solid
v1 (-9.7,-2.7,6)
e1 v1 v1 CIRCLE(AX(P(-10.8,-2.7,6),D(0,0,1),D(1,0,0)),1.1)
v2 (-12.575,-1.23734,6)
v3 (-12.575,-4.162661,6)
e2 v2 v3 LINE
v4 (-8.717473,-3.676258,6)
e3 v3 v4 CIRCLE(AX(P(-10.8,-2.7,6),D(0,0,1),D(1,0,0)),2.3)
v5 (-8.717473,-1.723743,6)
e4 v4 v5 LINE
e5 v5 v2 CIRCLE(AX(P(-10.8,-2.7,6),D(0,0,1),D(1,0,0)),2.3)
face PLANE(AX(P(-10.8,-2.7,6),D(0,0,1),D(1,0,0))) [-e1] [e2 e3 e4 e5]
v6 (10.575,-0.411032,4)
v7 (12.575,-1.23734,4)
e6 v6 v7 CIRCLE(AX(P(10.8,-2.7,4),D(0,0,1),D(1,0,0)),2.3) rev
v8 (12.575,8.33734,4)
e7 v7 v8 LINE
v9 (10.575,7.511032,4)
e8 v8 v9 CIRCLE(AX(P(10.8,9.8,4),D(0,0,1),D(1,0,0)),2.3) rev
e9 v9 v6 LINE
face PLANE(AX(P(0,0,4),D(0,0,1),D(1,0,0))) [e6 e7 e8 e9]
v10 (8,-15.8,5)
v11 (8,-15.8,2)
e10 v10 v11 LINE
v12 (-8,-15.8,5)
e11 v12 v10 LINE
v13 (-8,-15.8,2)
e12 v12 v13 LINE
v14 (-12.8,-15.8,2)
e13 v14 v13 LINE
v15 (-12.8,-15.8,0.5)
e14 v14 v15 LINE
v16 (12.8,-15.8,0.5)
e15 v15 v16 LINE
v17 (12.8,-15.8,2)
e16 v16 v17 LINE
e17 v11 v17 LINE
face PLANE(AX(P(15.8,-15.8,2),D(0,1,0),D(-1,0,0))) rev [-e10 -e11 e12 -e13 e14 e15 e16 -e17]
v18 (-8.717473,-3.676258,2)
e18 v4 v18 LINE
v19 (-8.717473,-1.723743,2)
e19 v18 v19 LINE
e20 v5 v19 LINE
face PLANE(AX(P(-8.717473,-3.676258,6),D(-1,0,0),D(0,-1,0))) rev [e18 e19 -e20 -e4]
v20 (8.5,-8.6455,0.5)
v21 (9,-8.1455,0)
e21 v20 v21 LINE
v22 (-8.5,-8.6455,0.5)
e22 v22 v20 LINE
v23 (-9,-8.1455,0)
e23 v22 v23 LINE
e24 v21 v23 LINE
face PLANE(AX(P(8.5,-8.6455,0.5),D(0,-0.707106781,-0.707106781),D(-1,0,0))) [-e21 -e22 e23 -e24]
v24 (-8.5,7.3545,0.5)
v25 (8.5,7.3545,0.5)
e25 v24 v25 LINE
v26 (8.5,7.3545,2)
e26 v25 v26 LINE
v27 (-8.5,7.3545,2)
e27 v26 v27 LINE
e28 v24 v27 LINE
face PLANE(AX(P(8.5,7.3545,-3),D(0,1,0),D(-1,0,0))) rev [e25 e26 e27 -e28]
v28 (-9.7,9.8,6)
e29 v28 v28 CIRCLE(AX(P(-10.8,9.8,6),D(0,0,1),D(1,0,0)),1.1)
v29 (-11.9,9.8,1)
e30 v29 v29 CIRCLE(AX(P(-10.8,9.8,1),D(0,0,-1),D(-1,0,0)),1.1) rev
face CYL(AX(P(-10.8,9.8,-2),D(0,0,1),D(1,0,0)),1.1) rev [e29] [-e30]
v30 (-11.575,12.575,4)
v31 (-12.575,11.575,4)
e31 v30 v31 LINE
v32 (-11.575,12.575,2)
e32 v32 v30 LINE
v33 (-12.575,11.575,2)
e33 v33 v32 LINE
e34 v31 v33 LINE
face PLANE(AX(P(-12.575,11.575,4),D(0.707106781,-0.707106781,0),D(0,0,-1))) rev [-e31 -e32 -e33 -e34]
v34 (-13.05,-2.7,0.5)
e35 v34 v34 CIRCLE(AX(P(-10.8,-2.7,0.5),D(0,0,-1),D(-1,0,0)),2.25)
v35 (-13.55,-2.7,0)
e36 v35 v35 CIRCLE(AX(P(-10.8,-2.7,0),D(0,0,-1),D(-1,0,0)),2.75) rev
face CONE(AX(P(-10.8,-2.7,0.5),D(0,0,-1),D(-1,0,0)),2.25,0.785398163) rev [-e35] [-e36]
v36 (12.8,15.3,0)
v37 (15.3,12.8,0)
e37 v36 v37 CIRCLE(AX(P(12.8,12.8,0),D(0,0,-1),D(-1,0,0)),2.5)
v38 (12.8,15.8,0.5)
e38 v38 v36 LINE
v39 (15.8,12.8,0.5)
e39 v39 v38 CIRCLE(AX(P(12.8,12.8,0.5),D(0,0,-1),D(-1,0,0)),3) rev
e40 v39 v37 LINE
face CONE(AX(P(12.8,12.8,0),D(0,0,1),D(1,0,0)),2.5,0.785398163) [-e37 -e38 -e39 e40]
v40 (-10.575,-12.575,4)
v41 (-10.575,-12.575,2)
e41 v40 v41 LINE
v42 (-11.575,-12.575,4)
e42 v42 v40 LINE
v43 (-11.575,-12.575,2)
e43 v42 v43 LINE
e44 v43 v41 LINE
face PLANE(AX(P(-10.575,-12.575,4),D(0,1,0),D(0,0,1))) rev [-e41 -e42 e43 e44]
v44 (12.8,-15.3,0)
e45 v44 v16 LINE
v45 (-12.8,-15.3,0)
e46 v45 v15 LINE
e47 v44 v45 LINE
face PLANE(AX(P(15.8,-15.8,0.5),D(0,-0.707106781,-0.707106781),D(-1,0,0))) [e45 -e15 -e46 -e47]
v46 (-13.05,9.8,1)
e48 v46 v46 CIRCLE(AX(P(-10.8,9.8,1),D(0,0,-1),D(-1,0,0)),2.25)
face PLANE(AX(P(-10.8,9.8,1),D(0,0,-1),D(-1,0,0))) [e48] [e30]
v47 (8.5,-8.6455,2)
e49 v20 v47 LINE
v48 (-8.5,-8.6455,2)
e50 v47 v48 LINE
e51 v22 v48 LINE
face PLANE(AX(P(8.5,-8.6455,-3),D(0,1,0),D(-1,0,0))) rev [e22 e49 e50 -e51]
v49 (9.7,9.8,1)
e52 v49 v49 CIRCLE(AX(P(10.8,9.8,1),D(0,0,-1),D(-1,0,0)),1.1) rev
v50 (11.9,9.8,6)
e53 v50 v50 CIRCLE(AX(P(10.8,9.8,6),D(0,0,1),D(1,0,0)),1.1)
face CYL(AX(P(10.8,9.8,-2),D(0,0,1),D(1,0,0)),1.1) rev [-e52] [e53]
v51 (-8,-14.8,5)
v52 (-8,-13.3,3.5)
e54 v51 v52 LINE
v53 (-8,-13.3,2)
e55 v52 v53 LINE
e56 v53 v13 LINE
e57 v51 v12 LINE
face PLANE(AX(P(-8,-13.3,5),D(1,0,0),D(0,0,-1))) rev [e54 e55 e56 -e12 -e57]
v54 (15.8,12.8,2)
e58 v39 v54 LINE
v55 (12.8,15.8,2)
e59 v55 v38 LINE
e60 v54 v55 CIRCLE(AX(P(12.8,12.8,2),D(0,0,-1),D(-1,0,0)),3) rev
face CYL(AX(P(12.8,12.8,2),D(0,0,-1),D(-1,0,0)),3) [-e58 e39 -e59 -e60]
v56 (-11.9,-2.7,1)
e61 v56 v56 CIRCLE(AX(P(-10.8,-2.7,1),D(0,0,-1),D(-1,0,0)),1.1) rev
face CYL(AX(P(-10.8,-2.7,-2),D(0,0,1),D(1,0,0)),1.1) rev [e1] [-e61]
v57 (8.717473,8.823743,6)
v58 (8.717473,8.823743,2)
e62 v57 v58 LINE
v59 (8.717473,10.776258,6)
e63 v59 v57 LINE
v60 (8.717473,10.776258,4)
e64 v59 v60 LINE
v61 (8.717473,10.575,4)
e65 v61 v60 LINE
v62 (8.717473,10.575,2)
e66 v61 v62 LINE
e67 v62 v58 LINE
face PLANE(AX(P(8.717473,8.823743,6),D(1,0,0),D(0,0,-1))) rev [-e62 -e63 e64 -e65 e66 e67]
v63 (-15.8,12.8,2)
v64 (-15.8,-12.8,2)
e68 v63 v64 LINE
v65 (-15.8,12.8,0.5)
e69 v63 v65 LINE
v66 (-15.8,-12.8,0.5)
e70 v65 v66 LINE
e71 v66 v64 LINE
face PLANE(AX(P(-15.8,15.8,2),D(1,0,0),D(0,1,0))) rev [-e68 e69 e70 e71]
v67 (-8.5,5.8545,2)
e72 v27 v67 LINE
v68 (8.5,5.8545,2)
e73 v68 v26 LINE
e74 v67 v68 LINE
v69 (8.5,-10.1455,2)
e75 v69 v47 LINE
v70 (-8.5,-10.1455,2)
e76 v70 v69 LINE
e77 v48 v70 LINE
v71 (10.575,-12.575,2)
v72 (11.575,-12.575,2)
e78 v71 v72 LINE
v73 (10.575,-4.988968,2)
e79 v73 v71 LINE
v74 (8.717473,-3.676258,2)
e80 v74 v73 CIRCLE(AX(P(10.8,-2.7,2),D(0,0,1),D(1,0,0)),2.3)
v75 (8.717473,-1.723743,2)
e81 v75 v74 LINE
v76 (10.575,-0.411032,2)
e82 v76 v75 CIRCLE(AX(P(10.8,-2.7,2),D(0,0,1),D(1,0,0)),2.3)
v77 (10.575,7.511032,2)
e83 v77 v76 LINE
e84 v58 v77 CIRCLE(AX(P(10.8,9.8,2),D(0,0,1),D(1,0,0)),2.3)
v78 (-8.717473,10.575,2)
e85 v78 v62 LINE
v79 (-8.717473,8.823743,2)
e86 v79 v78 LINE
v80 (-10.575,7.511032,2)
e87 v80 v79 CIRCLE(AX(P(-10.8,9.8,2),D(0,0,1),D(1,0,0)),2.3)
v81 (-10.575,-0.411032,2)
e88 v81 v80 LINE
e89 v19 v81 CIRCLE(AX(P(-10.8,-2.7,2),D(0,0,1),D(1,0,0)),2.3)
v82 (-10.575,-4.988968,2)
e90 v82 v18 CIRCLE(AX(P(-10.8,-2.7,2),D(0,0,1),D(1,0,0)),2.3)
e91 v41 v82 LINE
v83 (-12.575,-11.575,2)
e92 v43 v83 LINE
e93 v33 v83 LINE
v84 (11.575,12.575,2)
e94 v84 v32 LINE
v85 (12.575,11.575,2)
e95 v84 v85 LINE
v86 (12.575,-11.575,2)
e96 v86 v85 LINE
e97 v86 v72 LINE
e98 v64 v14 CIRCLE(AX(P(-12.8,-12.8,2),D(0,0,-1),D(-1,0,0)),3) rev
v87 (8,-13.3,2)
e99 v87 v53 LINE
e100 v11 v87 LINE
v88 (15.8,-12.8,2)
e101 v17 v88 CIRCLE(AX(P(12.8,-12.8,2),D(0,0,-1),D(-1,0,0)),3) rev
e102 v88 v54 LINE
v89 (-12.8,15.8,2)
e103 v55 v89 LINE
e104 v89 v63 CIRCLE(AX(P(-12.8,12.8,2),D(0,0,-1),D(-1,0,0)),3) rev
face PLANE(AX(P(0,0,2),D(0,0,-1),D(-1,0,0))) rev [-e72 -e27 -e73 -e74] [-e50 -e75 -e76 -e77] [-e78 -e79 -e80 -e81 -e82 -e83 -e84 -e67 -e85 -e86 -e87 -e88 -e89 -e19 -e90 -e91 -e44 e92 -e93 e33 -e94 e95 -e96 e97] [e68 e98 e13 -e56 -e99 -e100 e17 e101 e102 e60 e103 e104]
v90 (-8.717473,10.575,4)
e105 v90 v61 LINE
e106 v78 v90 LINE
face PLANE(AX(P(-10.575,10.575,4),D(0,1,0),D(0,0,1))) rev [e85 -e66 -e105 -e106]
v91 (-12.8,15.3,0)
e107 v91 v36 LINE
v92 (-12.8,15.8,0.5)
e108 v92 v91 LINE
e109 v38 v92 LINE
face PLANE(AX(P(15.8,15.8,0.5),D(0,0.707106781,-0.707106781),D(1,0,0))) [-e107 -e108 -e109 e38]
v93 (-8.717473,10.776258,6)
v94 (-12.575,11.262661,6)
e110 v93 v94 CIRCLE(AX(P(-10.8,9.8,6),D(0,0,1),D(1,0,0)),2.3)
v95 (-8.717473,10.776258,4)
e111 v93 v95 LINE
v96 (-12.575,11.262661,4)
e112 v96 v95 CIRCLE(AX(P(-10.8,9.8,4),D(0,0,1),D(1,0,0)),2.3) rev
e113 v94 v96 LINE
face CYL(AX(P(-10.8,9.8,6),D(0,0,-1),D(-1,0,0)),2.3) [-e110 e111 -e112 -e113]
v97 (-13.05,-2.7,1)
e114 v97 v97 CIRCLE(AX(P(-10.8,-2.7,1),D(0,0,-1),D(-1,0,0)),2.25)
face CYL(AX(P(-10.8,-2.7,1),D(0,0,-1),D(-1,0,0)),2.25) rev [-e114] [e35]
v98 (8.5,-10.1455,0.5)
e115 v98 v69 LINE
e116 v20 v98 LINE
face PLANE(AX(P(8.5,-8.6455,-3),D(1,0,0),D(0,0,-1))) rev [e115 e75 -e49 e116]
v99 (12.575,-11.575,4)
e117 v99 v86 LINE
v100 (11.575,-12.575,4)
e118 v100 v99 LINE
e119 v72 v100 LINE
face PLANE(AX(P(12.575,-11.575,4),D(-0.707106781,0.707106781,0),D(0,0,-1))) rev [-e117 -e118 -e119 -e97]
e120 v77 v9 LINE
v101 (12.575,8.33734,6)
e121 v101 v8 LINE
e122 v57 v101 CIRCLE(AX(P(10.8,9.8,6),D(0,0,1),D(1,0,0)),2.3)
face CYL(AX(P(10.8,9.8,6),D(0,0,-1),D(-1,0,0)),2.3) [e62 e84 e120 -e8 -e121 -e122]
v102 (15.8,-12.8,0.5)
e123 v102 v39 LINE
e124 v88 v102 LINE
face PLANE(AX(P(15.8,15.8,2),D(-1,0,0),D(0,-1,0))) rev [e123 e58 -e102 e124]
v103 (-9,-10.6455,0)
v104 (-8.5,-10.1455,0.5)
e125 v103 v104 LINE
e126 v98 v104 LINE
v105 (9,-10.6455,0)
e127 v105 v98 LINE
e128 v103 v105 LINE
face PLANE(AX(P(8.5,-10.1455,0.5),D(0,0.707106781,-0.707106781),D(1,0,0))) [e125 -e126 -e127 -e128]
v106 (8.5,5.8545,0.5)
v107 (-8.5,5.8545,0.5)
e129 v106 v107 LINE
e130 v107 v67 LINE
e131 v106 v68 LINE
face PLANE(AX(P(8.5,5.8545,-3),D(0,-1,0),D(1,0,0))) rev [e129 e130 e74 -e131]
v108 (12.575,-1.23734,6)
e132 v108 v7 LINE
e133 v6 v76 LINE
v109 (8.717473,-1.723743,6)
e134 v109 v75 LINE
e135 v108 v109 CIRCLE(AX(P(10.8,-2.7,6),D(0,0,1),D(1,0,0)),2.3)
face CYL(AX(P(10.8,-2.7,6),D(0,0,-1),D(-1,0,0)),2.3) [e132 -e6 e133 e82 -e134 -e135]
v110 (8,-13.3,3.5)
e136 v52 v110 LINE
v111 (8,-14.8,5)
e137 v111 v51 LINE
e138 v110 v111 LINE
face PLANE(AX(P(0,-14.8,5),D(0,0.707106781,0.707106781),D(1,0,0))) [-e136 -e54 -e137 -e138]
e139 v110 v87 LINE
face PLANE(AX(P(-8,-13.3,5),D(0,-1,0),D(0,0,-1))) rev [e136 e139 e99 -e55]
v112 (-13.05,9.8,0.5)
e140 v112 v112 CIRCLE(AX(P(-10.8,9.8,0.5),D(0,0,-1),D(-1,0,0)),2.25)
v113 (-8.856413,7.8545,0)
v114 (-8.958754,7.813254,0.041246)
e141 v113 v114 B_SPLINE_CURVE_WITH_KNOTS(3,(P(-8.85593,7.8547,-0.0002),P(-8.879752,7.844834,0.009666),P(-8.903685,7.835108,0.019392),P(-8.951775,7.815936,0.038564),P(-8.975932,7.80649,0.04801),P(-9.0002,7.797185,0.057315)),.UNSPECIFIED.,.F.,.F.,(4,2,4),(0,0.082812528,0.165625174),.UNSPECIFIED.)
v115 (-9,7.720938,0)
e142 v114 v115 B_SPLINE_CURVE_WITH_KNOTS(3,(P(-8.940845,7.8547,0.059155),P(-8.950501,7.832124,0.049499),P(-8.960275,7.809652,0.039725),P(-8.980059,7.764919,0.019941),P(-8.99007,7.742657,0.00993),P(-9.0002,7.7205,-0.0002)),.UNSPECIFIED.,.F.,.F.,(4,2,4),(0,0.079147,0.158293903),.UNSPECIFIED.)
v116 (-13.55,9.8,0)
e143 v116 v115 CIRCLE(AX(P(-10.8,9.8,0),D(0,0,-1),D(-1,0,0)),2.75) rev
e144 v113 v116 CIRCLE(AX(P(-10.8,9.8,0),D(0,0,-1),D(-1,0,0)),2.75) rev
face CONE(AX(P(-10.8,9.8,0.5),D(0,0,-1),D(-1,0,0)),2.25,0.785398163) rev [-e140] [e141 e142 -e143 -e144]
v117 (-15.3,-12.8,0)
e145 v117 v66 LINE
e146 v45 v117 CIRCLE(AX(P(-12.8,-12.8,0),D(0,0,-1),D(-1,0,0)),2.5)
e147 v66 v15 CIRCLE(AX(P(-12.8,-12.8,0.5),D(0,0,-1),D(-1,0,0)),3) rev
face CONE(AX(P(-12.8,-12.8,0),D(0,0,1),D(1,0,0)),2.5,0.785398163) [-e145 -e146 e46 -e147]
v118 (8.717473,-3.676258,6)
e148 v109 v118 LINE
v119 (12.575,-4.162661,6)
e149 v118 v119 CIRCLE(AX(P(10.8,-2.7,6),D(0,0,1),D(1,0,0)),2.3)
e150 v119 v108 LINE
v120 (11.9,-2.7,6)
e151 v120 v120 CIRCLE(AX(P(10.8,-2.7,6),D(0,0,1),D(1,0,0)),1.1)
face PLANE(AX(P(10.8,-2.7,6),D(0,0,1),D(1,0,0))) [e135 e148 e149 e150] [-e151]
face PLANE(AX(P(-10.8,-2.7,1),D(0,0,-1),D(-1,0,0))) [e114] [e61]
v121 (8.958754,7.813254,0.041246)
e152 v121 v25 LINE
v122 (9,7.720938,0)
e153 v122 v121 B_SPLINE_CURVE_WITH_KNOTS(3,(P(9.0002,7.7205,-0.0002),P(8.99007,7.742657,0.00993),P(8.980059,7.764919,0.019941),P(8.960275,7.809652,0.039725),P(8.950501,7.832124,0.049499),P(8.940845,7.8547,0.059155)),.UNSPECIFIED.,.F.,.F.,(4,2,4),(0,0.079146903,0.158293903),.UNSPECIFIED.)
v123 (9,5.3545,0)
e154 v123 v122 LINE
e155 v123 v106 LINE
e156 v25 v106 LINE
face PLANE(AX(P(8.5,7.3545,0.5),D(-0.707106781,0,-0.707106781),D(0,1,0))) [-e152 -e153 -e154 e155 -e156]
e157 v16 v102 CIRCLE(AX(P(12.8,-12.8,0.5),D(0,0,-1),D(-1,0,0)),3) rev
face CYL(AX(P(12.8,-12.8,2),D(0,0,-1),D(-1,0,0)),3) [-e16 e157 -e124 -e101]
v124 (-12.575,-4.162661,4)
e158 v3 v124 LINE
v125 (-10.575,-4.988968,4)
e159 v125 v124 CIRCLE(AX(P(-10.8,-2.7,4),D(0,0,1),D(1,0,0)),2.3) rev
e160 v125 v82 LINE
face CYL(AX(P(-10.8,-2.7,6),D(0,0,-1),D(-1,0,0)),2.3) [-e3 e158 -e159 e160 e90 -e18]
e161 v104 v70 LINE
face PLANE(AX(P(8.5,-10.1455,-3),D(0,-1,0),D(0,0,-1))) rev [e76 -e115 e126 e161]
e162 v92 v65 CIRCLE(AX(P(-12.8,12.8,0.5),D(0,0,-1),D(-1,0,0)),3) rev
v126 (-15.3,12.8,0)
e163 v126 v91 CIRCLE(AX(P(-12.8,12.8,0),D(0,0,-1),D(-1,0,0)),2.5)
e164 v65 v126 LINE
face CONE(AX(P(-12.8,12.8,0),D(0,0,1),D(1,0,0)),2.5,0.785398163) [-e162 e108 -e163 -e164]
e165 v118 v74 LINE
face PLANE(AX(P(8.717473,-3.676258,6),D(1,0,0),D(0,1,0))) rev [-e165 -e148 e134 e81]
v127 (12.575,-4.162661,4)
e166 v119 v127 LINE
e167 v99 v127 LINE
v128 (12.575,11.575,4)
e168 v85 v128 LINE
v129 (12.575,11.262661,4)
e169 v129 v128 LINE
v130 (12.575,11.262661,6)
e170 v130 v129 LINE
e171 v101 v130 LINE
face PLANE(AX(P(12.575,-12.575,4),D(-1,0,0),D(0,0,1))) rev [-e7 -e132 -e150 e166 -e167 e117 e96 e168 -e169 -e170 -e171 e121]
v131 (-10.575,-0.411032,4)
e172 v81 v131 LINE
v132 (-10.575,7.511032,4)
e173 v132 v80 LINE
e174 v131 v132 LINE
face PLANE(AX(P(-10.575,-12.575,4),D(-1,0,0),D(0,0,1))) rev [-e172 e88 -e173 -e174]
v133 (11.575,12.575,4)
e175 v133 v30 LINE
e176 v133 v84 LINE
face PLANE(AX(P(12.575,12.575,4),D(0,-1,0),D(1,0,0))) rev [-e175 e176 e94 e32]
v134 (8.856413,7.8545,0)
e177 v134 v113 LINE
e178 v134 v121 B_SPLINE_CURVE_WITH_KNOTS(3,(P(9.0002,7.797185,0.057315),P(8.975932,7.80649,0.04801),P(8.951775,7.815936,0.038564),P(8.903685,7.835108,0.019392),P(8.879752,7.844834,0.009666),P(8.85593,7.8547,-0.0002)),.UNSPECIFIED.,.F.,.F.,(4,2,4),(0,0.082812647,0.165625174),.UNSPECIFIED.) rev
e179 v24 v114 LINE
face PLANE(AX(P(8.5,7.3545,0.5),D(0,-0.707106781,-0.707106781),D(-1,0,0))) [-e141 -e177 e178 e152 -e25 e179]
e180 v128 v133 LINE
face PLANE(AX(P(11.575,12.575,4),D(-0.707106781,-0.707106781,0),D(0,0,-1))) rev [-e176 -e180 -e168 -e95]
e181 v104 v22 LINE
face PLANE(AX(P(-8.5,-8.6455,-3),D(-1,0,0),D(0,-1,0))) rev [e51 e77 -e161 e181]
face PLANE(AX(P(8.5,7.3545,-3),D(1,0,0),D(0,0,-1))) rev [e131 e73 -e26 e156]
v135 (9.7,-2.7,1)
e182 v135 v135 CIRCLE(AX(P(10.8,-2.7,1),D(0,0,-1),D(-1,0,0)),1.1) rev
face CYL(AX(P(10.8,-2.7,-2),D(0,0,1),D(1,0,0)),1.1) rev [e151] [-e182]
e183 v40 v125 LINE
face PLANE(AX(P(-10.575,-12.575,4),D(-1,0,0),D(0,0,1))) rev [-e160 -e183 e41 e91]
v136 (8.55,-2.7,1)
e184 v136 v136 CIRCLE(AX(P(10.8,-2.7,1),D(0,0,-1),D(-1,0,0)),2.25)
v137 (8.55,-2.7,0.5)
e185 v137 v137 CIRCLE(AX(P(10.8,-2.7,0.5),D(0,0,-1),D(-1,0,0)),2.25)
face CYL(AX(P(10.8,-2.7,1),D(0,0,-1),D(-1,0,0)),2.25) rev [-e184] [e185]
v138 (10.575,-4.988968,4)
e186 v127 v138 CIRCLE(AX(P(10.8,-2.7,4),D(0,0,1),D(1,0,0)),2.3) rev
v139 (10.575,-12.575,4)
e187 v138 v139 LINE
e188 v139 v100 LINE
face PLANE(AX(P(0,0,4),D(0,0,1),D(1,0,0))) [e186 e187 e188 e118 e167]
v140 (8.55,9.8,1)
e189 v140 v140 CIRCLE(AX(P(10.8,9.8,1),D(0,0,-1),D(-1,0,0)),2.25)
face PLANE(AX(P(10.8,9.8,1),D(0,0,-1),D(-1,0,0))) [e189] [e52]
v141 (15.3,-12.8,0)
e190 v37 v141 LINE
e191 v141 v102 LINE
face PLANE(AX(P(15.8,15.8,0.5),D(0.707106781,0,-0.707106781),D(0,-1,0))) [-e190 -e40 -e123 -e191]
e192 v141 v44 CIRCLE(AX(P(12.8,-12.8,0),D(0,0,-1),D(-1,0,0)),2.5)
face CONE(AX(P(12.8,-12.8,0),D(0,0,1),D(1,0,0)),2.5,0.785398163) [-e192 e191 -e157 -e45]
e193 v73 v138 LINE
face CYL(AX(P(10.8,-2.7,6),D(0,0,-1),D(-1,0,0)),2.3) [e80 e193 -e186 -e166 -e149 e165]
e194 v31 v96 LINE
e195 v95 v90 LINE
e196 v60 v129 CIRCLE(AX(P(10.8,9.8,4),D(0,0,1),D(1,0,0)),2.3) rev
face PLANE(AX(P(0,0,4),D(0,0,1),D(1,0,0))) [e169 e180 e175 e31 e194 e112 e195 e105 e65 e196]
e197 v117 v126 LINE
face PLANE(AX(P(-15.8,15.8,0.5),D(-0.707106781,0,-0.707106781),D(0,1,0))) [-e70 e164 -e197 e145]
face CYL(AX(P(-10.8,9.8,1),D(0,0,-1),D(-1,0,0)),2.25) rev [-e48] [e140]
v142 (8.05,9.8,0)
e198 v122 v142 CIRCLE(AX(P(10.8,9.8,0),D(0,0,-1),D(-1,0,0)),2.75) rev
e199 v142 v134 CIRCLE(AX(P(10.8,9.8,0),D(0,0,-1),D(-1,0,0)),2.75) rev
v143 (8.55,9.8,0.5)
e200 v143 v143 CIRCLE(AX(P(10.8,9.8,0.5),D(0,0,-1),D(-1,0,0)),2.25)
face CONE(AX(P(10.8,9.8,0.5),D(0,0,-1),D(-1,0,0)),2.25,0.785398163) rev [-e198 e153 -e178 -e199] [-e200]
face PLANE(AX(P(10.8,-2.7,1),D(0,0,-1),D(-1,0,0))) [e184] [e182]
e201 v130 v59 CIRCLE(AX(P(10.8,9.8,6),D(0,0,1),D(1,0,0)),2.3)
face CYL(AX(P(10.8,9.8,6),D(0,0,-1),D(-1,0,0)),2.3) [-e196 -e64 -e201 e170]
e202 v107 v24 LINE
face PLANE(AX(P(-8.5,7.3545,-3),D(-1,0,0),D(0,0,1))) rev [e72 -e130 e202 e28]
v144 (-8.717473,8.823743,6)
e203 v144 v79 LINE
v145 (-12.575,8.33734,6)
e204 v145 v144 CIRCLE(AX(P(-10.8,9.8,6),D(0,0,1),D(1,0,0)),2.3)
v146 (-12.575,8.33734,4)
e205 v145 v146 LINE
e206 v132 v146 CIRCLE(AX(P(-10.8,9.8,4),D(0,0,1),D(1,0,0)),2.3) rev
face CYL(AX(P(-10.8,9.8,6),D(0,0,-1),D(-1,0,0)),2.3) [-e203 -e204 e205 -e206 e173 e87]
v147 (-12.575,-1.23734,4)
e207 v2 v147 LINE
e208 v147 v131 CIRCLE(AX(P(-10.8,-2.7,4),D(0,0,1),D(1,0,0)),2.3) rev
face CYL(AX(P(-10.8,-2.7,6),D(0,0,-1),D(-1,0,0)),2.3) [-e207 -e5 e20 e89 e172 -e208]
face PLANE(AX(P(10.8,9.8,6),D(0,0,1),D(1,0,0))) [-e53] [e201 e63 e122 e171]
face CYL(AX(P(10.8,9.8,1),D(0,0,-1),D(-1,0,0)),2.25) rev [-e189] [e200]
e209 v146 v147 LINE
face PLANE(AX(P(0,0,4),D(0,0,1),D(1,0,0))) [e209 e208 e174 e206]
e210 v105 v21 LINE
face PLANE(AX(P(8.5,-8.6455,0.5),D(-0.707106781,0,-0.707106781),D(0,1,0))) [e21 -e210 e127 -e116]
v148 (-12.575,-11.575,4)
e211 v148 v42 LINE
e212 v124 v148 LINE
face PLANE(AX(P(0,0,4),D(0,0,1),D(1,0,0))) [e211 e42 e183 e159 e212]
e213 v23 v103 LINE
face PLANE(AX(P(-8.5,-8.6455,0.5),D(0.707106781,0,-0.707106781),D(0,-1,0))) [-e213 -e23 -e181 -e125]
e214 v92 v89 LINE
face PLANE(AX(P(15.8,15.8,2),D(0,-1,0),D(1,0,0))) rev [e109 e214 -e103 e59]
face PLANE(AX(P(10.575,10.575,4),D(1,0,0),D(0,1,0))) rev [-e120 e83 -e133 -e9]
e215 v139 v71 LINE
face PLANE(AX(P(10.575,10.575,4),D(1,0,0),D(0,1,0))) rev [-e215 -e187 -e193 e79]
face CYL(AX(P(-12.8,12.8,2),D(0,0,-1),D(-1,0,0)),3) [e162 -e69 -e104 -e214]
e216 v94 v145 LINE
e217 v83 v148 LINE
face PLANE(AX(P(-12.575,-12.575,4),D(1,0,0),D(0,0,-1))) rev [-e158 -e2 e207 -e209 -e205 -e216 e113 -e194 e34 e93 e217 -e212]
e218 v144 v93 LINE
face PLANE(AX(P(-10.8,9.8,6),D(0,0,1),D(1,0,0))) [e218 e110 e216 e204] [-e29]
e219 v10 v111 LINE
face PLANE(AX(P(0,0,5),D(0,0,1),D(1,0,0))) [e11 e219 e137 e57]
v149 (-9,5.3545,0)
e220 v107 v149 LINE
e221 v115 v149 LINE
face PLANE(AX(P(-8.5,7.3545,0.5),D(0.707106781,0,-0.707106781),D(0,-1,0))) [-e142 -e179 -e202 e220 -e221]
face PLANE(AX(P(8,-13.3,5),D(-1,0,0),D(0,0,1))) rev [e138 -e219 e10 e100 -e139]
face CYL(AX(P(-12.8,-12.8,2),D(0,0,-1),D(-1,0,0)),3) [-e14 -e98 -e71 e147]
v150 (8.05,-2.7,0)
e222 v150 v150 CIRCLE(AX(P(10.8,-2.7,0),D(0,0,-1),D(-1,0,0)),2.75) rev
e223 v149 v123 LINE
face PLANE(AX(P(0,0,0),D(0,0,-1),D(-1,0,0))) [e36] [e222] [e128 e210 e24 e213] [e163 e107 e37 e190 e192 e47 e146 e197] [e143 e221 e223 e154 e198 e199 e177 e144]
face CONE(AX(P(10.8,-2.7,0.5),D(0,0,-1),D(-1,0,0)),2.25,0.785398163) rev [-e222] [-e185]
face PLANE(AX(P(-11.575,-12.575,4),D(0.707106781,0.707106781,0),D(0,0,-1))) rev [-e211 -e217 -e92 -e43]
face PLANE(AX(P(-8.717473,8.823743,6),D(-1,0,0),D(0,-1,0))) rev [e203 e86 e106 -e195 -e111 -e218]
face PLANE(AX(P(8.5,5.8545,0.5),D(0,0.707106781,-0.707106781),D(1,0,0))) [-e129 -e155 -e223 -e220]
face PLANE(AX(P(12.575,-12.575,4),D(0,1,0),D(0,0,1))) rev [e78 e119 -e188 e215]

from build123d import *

# Parameters (mm, degrees)
SKETCH2_W           = 31.6
SKETCH2_H           = 31.6
BOSS_EXTRUDE1_DEPTH = 2
FILLET1_R           = 3
BOSS_EXTRUDE2_DEPTH = 2
CHAMFER1_SIZE       = 1
SKETCH6_W           = 16
SKETCH6_H           = 2.5
BOSS_EXTRUDE3_DEPTH = 3
BOSS_EXTRUDE4_DEPTH = 4
SKETCH8_R           = 1.1
CUT_EXTRUDE1_DEPTH  = 8
SKETCH9_R           = 2.25
CUT_EXTRUDE2_DEPTH  = 1
SKETCH10_W          = 17
SKETCH10_H          = 1.5
CUT_EXTRUDE3_DEPTH  = 5
CHAMFER2_SIZE       = 0.5
CHAMFER3_SIZE       = 1.5


with BuildPart() as part:
    # Sketch2 → Boss-Extrude1 (new body)
    with BuildSketch(Plane.XY):
        Rectangle(SKETCH2_W, SKETCH2_H)
    extrude(amount=BOSS_EXTRUDE1_DEPTH)

    # Fillet1
    fillet1_edges = [part.edges().sort_by_distance(p)[0] for p in [
        (-15.8, 15.8, 1),
        (15.8, 15.8, 1),
        (15.8, -15.8, 1),
        (-15.8, -15.8, 1),
    ]]
    fillet(fillet1_edges, radius=FILLET1_R)

    # Sketch5 → Boss-Extrude2 (add)
    with BuildSketch(Plane.XY.offset(2)):
        Polygon((-10.575, -12.575), (-10.575, 10.575), (10.575, 10.575), (10.575, -12.575), (12.575, -12.575), (12.575, 12.575), (-12.575, 12.575), (-12.575, -12.575), align=None)
    extrude(amount=BOSS_EXTRUDE2_DEPTH)

    # Chamfer1
    chamfer1_edges = [part.edges().sort_by_distance(p)[0] for p in [
        (-12.575, 12.575, 3),
        (-12.575, -12.575, 3),
        (12.575, -12.575, 3),
        (12.575, 12.575, 3),
    ]]
    chamfer(chamfer1_edges, length=CHAMFER1_SIZE)

    # Sketch6 → Boss-Extrude3 (add)
    with BuildSketch(Plane.XY.offset(2)):
        with Locations((0, -14.55)):
            Rectangle(SKETCH6_W, SKETCH6_H)
    extrude(amount=BOSS_EXTRUDE3_DEPTH)

    # Sketch7 → Boss-Extrude4 (add)
    with BuildSketch(Plane.XY.offset(2)):
        with BuildLine():
            Line((12.575, -4.162660527), (12.575, -1.237339569))
            ThreePointArc((12.575, -1.237339569), (10.512267156, -0.418068914), (8.717472576, -1.723742534))
            Line((8.717472576, -1.723742534), (8.717472576, -3.676257561))
            ThreePointArc((8.717472576, -3.676257561), (10.512267156, -4.981931182), (12.575, -4.162660527))
        make_face()
        with BuildLine():
            Line((-12.575, -1.237339569), (-12.575, -4.162660527))
            ThreePointArc((-12.575, -4.162660527), (-10.512267156, -4.981931182), (-8.717472576, -3.676257561))
            Line((-8.717472576, -3.676257561), (-8.717472576, -1.723742534))
            ThreePointArc((-8.717472576, -1.723742534), (-10.512267156, -0.418068914), (-12.575, -1.237339569))
        make_face()
        with BuildLine():
            Line((-12.575, 11.26266067), (-12.575, 8.337339712))
            ThreePointArc((-12.575, 8.337339712), (-10.512267156, 7.518069057), (-8.717472576, 8.823742677))
            Line((-8.717472576, 8.823742677), (-8.717472576, 10.776257704))
            ThreePointArc((-8.717472576, 10.776257704), (-10.512267156, 12.081931325), (-12.575, 11.26266067))
        make_face()
        with BuildLine():
            Line((12.575, 8.337339712), (12.575, 11.26266067))
            ThreePointArc((12.575, 11.26266067), (10.512267156, 12.081931325), (8.717472576, 10.776257704))
            Line((8.717472576, 10.776257704), (8.717472576, 8.823742677))
            ThreePointArc((8.717472576, 8.823742677), (10.512267156, 7.518069057), (12.575, 8.337339712))
        make_face()
    extrude(amount=BOSS_EXTRUDE4_DEPTH)

    # Sketch8 → Cut-Extrude1 (cut)
    with BuildSketch(Plane.XY.offset(6)):
        with Locations((10.800000191, -2.700000048)):
            Circle(SKETCH8_R)
        with Locations((-10.800000191, -2.700000048)):
            Circle(SKETCH8_R)
        with Locations((-10.800000191, 9.800000191)):
            Circle(SKETCH8_R)
        with Locations((10.800000191, 9.800000191)):
            Circle(SKETCH8_R)
    extrude(amount=-CUT_EXTRUDE1_DEPTH, mode=Mode.SUBTRACT)

    # Sketch9 → Cut-Extrude2 (cut)
    with BuildSketch(Plane(origin=(0, 0, 0), x_dir=(-1, 0, 0), z_dir=(0, 0, -1))):
        with Locations((10.800000191, -2.700000048)):
            Circle(SKETCH9_R)
        with Locations((-10.800000191, -2.700000048)):
            Circle(SKETCH9_R)
        with Locations((-10.800000191, 9.800000191)):
            Circle(SKETCH9_R)
        with Locations((10.800000191, 9.800000191)):
            Circle(SKETCH9_R)
    extrude(amount=-CUT_EXTRUDE2_DEPTH, mode=Mode.SUBTRACT)

    # Sketch10 → Cut-Extrude3 (cut)
    with BuildSketch(Plane.XY.offset(2)):
        with Locations((0, -9.395499737)):
            Rectangle(SKETCH10_W, SKETCH10_H)
        with Locations((0, 6.604500263)):
            Rectangle(SKETCH10_W, SKETCH10_H)
    extrude(amount=-CUT_EXTRUDE3_DEPTH, mode=Mode.SUBTRACT)

    # Chamfer2
    # the kernel refuses this chamfer: 0.5 mm, written as the material it takes off along each edge
    with BuildSketch(Plane(origin=(12.8, 15.8, 0), x_dir=(0, 0.02749587661058563, 0.9996219169112968), z_dir=(-1, 0, 0)), Plane(origin=(-15.8, 12.8, 0), x_dir=(-0.02749587661058563, 0, 0.9996219169112968), z_dir=(0, -1, 0)), Plane(origin=(15.8, -12.8, 0), x_dir=(0.02749587661058563, 0, 0.9996219169112968), z_dir=(0, 1, 0)), Plane(origin=(-12.8, -15.8, 0), x_dir=(0, -0.02749587661058563, 0.9996219169112968), z_dir=(1, 0, 0))) as chamfer2_piece_1:
        Polygon((CHAMFER2_SIZE * 0.999621916911, -CHAMFER2_SIZE * 0.0274958766106), (-CHAMFER2_SIZE * 0.0274958766106, -CHAMFER2_SIZE * 0.999621916911), (0, 0), align=None)
    extrude(amount=25.6, mode=Mode.SUBTRACT)
    with BuildSketch(Plane(origin=(-12.8, 12.8, 0), x_dir=(0, 1, 0), z_dir=(1, 0, 0))) as chamfer2_piece_2:
        Polygon((3, CHAMFER2_SIZE), (3 - CHAMFER2_SIZE, 0), (3, 0), align=None)
    revolve(axis=Axis((-12.8, 12.8, 0), (0, 0, 1)), revolution_arc=90, mode=Mode.SUBTRACT)
    with BuildSketch(Plane(origin=(-12.8, -12.8, 0), x_dir=(-1, 0, 0), z_dir=(0, 1, 0))) as chamfer2_piece_3:
        Polygon((3, CHAMFER2_SIZE), (3 - CHAMFER2_SIZE, 0), (3, 0), align=None)
    revolve(axis=Axis((-12.8, -12.8, 0), (0, 0, 1)), revolution_arc=90, mode=Mode.SUBTRACT)
    with BuildSketch(Plane(origin=(12.8, -12.8, 0), x_dir=(0, -1, 0), z_dir=(-1, 0, 0))) as chamfer2_piece_4:
        Polygon((3, CHAMFER2_SIZE), (3 - CHAMFER2_SIZE, 0), (3, 0), align=None)
    revolve(axis=Axis((12.8, -12.8, 0), (0, 0, 1)), revolution_arc=90, mode=Mode.SUBTRACT)
    with BuildSketch(Plane(origin=(12.8, 12.8, 0), x_dir=(0, 1, 0), z_dir=(-1, 0, 0))) as chamfer2_piece_5:
        Polygon((3, -CHAMFER2_SIZE), (3 - CHAMFER2_SIZE, 0), (3, 0), align=None)
    revolve(axis=Axis((12.8, 12.8, 0), (0, 0, -1)), revolution_arc=90, mode=Mode.SUBTRACT)
    with BuildSketch(Plane(origin=(-10.800000191, -2.700000048, 0), x_dir=(-1, 0, 0), z_dir=(0, -1, 0))) as chamfer2_piece_6:
        Polygon((2.25 + CHAMFER2_SIZE, 0), (2.25, -CHAMFER2_SIZE), (2.25, 0), align=None)
    revolve(axis=Axis((-10.800000191, -2.700000048, 0), (0, 0, -1)), mode=Mode.SUBTRACT)
    with BuildSketch(Plane(origin=(10.800000191, -2.700000048, 0), x_dir=(-1, 0, 0), z_dir=(0, -1, 0))) as chamfer2_piece_7:
        Polygon((2.25 + CHAMFER2_SIZE, 0), (2.25, -CHAMFER2_SIZE), (2.25, 0), align=None)
    revolve(axis=Axis((10.800000191, -2.700000048, 0), (0, 0, -1)), mode=Mode.SUBTRACT)
    with BuildSketch(Plane(origin=(10.800000191, 9.800000191, 0), x_dir=(-1, 0, 0), z_dir=(0, -1, 0))) as chamfer2_piece_8:
        Polygon((2.25 + CHAMFER2_SIZE, 0), (2.25, -CHAMFER2_SIZE), (2.25, 0), align=None)
    revolve(axis=Axis((10.800000191, 9.800000191, 0), (0, 0, -1)), mode=Mode.SUBTRACT)
    with BuildSketch(Plane(origin=(-10.800000191, 9.800000191, 0), x_dir=(-1, 0, 0), z_dir=(0, -1, 0))) as chamfer2_piece_9:
        Polygon((2.25 + CHAMFER2_SIZE, 0), (2.25, -CHAMFER2_SIZE), (2.25, 0), align=None)
    revolve(axis=Axis((-10.800000191, 9.800000191, 0), (0, 0, -1)), mode=Mode.SUBTRACT)
    with BuildSketch(Plane(origin=(-8.5, -10.145499737, 0), x_dir=(0, 0.02749587661058563, 0.9996219169112968), z_dir=(1, 0, 0)), Plane(origin=(8.5, -8.645499737, 0), x_dir=(0, -0.02749587661058563, 0.9996219169112968), z_dir=(-1, 0, 0)), Plane(origin=(-8.5, 5.854500263, 0), x_dir=(0, 0.027495876610583895, 0.9996219169112968), z_dir=(1, 0, 0)), Plane(origin=(8.5, 7.354500263, 0), x_dir=(0, -0.027495876610587354, 0.9996219169112968), z_dir=(-1, 0, 0))) as chamfer2_piece_10:
        Polygon((CHAMFER2_SIZE * 0.999621916911, CHAMFER2_SIZE * 0.0274958766106), (-CHAMFER2_SIZE * 0.0274958766106, CHAMFER2_SIZE * 0.999621916911), (0, 0), align=None)
    extrude(amount=17, mode=Mode.SUBTRACT)
    with BuildSketch(Plane(origin=(8.5, -10.145499737, 0), x_dir=(-0.02749587661058563, 0, 0.9996219169112968), z_dir=(0, 1, 0)), Plane(origin=(-8.5, -8.645499737, 0), x_dir=(0.02749587661058563, 0, 0.9996219169112968), z_dir=(0, -1, 0)), Plane(origin=(8.5, 5.854500263, 0), x_dir=(-0.02749587661058563, 0, 0.9996219169112968), z_dir=(0, 1, 0)), Plane(origin=(-8.5, 7.354500263, 0), x_dir=(0.02749587661058563, 0, 0.9996219169112968), z_dir=(0, -1, 0))) as chamfer2_piece_11:
        Polygon((CHAMFER2_SIZE * 0.999621916911, CHAMFER2_SIZE * 0.0274958766106), (-CHAMFER2_SIZE * 0.0274958766106, CHAMFER2_SIZE * 0.999621916911), (0, 0), align=None)
    extrude(amount=1.5, mode=Mode.SUBTRACT)
    with BuildSketch(Plane(origin=(-8.5, -8.645499737, 0), x_dir=(0.02749587661058563, 0, 0.9996219169112968), z_dir=(0, -1, 0))) as chamfer2_piece_12a_section:
        Polygon((CHAMFER2_SIZE * 0.999621916911, CHAMFER2_SIZE * 0.0274958766106), (-CHAMFER2_SIZE * 0.0274958766106, CHAMFER2_SIZE * 0.999621916911), (0, 0), align=None)
    chamfer2_piece_12a = extrude(amount=2.785841494, mode=Mode.PRIVATE)
    chamfer2_piece_12a = split(chamfer2_piece_12a, bisect_by=Plane(origin=(-8.664896813, -10.145499737, 0.164896813), z_dir=(0, -1, 0)), keep=Keep.TOP, mode=Mode.PRIVATE)
    with BuildSketch(Plane(origin=(-9.785841494, -10.145499737, 0), x_dir=(0, 0.02749587661058563, 0.9996219169112968), z_dir=(1, 0, 0))) as chamfer2_piece_12b_section:
        Polygon((CHAMFER2_SIZE * 0.999621916911, CHAMFER2_SIZE * 0.0274958766106), (-CHAMFER2_SIZE * 0.0274958766106, CHAMFER2_SIZE * 0.999621916911), (0, 0), align=None)
    chamfer2_piece_12b = extrude(amount=18.285841494, mode=Mode.PRIVATE)
    chamfer2_piece_12b = split(chamfer2_piece_12b, bisect_by=Plane(origin=(-8.5, -10.310396551, 0.164896813), z_dir=(-1, 0, 0)), keep=Keep.TOP, mode=Mode.PRIVATE)
    chamfer2_piece_12 = chamfer2_piece_12a & chamfer2_piece_12b
    add(chamfer2_piece_12, mode=Mode.SUBTRACT)
    with BuildSketch(Plane(origin=(-8.5, -10.145499737, 0), x_dir=(0, 0.02749587661058563, 0.9996219169112968), z_dir=(1, 0, 0))) as chamfer2_piece_13a_section:
        Polygon((CHAMFER2_SIZE * 0.999621916911, CHAMFER2_SIZE * 0.0274958766106), (-CHAMFER2_SIZE * 0.0274958766106, CHAMFER2_SIZE * 0.999621916911), (0, 0), align=None)
    chamfer2_piece_13a = extrude(amount=18.285841494, mode=Mode.PRIVATE)
    chamfer2_piece_13a = split(chamfer2_piece_13a, bisect_by=Plane(origin=(8.5, -10.310396551, 0.164896813), z_dir=(1, 0, 0)), keep=Keep.TOP, mode=Mode.PRIVATE)
    with BuildSketch(Plane(origin=(8.5, -11.431341231, 0), x_dir=(-0.02749587661058563, 0, 0.9996219169112968), z_dir=(0, 1, 0))) as chamfer2_piece_13b_section:
        Polygon((CHAMFER2_SIZE * 0.999621916911, CHAMFER2_SIZE * 0.0274958766106), (-CHAMFER2_SIZE * 0.0274958766106, CHAMFER2_SIZE * 0.999621916911), (0, 0), align=None)
    chamfer2_piece_13b = extrude(amount=2.785841494, mode=Mode.PRIVATE)
    chamfer2_piece_13b = split(chamfer2_piece_13b, bisect_by=Plane(origin=(8.664896813, -10.145499737, 0.164896813), z_dir=(0, -1, 0)), keep=Keep.TOP, mode=Mode.PRIVATE)
    chamfer2_piece_13 = chamfer2_piece_13a & chamfer2_piece_13b
    add(chamfer2_piece_13, mode=Mode.SUBTRACT)
    with BuildSketch(Plane(origin=(9.785841494, -8.645499737, 0), x_dir=(0, -0.02749587661058563, 0.9996219169112968), z_dir=(-1, 0, 0))) as chamfer2_piece_14a_section:
        Polygon((CHAMFER2_SIZE * 0.999621916911, CHAMFER2_SIZE * 0.0274958766106), (-CHAMFER2_SIZE * 0.0274958766106, CHAMFER2_SIZE * 0.999621916911), (0, 0), align=None)
    chamfer2_piece_14a = extrude(amount=18.285841494, mode=Mode.PRIVATE)
    chamfer2_piece_14a = split(chamfer2_piece_14a, bisect_by=Plane(origin=(8.5, -8.480602924, 0.164896813), z_dir=(1, 0, 0)), keep=Keep.TOP, mode=Mode.PRIVATE)
    with BuildSketch(Plane(origin=(8.5, -10.145499737, 0), x_dir=(-0.02749587661058563, 0, 0.9996219169112968), z_dir=(0, 1, 0))) as chamfer2_piece_14b_section:
        Polygon((CHAMFER2_SIZE * 0.999621916911, CHAMFER2_SIZE * 0.0274958766106), (-CHAMFER2_SIZE * 0.0274958766106, CHAMFER2_SIZE * 0.999621916911), (0, 0), align=None)
    chamfer2_piece_14b = extrude(amount=2.785841494, mode=Mode.PRIVATE)
    chamfer2_piece_14b = split(chamfer2_piece_14b, bisect_by=Plane(origin=(8.664896813, -8.645499737, 0.164896813), z_dir=(0, 1, 0)), keep=Keep.TOP, mode=Mode.PRIVATE)
    chamfer2_piece_14 = chamfer2_piece_14a & chamfer2_piece_14b
    add(chamfer2_piece_14, mode=Mode.SUBTRACT)
    with BuildSketch(Plane(origin=(8.5, -8.645499737, 0), x_dir=(0, -0.02749587661058563, 0.9996219169112968), z_dir=(-1, 0, 0))) as chamfer2_piece_15a_section:
        Polygon((CHAMFER2_SIZE * 0.999621916911, CHAMFER2_SIZE * 0.0274958766106), (-CHAMFER2_SIZE * 0.0274958766106, CHAMFER2_SIZE * 0.999621916911), (0, 0), align=None)
    chamfer2_piece_15a = extrude(amount=18.285841494, mode=Mode.PRIVATE)
    chamfer2_piece_15a = split(chamfer2_piece_15a, bisect_by=Plane(origin=(-8.5, -8.480602924, 0.164896813), z_dir=(-1, 0, 0)), keep=Keep.TOP, mode=Mode.PRIVATE)
    with BuildSketch(Plane(origin=(-8.5, -7.359658243, 0), x_dir=(0.02749587661058563, 0, 0.9996219169112968), z_dir=(0, -1, 0))) as chamfer2_piece_15b_section:
        Polygon((CHAMFER2_SIZE * 0.999621916911, CHAMFER2_SIZE * 0.0274958766106), (-CHAMFER2_SIZE * 0.0274958766106, CHAMFER2_SIZE * 0.999621916911), (0, 0), align=None)
    chamfer2_piece_15b = extrude(amount=2.785841494, mode=Mode.PRIVATE)
    chamfer2_piece_15b = split(chamfer2_piece_15b, bisect_by=Plane(origin=(-8.664896813, -8.645499737, 0.164896813), z_dir=(0, 1, 0)), keep=Keep.TOP, mode=Mode.PRIVATE)
    chamfer2_piece_15 = chamfer2_piece_15a & chamfer2_piece_15b
    add(chamfer2_piece_15, mode=Mode.SUBTRACT)
    with BuildSketch(Plane(origin=(-8.5, 7.354500263, 0), x_dir=(0.02749587661058563, 0, 0.9996219169112968), z_dir=(0, -1, 0))) as chamfer2_piece_16a_section:
        Polygon((CHAMFER2_SIZE * 0.999621916911, CHAMFER2_SIZE * 0.0274958766106), (-CHAMFER2_SIZE * 0.0274958766106, CHAMFER2_SIZE * 0.999621916911), (0, 0), align=None)
    chamfer2_piece_16a = extrude(amount=2.785841494, mode=Mode.PRIVATE)
    chamfer2_piece_16a = split(chamfer2_piece_16a, bisect_by=Plane(origin=(-8.664896813, 5.854500263, 0.164896813), z_dir=(0, -1, 0)), keep=Keep.TOP, mode=Mode.PRIVATE)
    with BuildSketch(Plane(origin=(-9.785841494, 5.854500263, 0), x_dir=(0, 0.02749587661058563, 0.9996219169112968), z_dir=(1, 0, 0))) as chamfer2_piece_16b_section:
        Polygon((CHAMFER2_SIZE * 0.999621916911, CHAMFER2_SIZE * 0.0274958766106), (-CHAMFER2_SIZE * 0.0274958766106, CHAMFER2_SIZE * 0.999621916911), (0, 0), align=None)
    chamfer2_piece_16b = extrude(amount=18.285841494, mode=Mode.PRIVATE)
    chamfer2_piece_16b = split(chamfer2_piece_16b, bisect_by=Plane(origin=(-8.5, 5.689603449, 0.164896813), z_dir=(-1, 0, 0)), keep=Keep.TOP, mode=Mode.PRIVATE)
    chamfer2_piece_16 = chamfer2_piece_16a & chamfer2_piece_16b
    add(chamfer2_piece_16, mode=Mode.SUBTRACT)
    with BuildSketch(Plane(origin=(-8.5, 5.854500263, 0), x_dir=(0, 0.027495876610583895, 0.9996219169112968), z_dir=(1, 0, 0))) as chamfer2_piece_17a_section:
        Polygon((CHAMFER2_SIZE * 0.999621916911, CHAMFER2_SIZE * 0.0274958766106), (-CHAMFER2_SIZE * 0.0274958766106, CHAMFER2_SIZE * 0.999621916911), (0, 0), align=None)
    chamfer2_piece_17a = extrude(amount=18.285841494, mode=Mode.PRIVATE)
    chamfer2_piece_17a = split(chamfer2_piece_17a, bisect_by=Plane(origin=(8.5, 5.689603449, 0.164896813), z_dir=(1, 0, 0)), keep=Keep.TOP, mode=Mode.PRIVATE)
    with BuildSketch(Plane(origin=(8.5, 4.568658769, 0), x_dir=(-0.02749587661058563, 0, 0.9996219169112968), z_dir=(0, 1, 0))) as chamfer2_piece_17b_section:
        Polygon((CHAMFER2_SIZE * 0.999621916911, CHAMFER2_SIZE * 0.0274958766106), (-CHAMFER2_SIZE * 0.0274958766106, CHAMFER2_SIZE * 0.999621916911), (0, 0), align=None)
    chamfer2_piece_17b = extrude(amount=2.785841494, mode=Mode.PRIVATE)
    chamfer2_piece_17b = split(chamfer2_piece_17b, bisect_by=Plane(origin=(8.664896813, 5.854500263, 0.164896813), z_dir=(0, -1, 0)), keep=Keep.TOP, mode=Mode.PRIVATE)
    chamfer2_piece_17 = chamfer2_piece_17a & chamfer2_piece_17b
    add(chamfer2_piece_17, mode=Mode.SUBTRACT)
    with BuildSketch(Plane(origin=(9.785841494, 7.354500263, 0), x_dir=(0, -0.02749587661058563, 0.9996219169112968), z_dir=(-1, 0, 0))) as chamfer2_piece_18a_section:
        Polygon((CHAMFER2_SIZE * 0.999621916911, CHAMFER2_SIZE * 0.0274958766106), (-CHAMFER2_SIZE * 0.0274958766106, CHAMFER2_SIZE * 0.999621916911), (0, 0), align=None)
    chamfer2_piece_18a = extrude(amount=18.285841494, mode=Mode.PRIVATE)
    chamfer2_piece_18a = split(chamfer2_piece_18a, bisect_by=Plane(origin=(8.5, 7.519397076, 0.164896813), z_dir=(1, 0, 0)), keep=Keep.TOP, mode=Mode.PRIVATE)
    with BuildSketch(Plane(origin=(8.5, 5.854500263, 0), x_dir=(-0.02749587661058563, 0, 0.9996219169112968), z_dir=(0, 1, 0))) as chamfer2_piece_18b_section:
        Polygon((CHAMFER2_SIZE * 0.999621916911, CHAMFER2_SIZE * 0.0274958766106), (-CHAMFER2_SIZE * 0.0274958766106, CHAMFER2_SIZE * 0.999621916911), (0, 0), align=None)
    chamfer2_piece_18b = extrude(amount=2.785841494, mode=Mode.PRIVATE)
    chamfer2_piece_18b = split(chamfer2_piece_18b, bisect_by=Plane(origin=(8.664896813, 7.354500263, 0.164896813), z_dir=(0, 1, 0)), keep=Keep.TOP, mode=Mode.PRIVATE)
    chamfer2_piece_18 = chamfer2_piece_18a & chamfer2_piece_18b
    add(chamfer2_piece_18, mode=Mode.SUBTRACT)
    with BuildSketch(Plane(origin=(8.5, 7.354500263, 0), x_dir=(0, -0.027495876610587354, 0.9996219169112968), z_dir=(-1, 0, 0))) as chamfer2_piece_19a_section:
        Polygon((CHAMFER2_SIZE * 0.999621916911, CHAMFER2_SIZE * 0.0274958766106), (-CHAMFER2_SIZE * 0.0274958766106, CHAMFER2_SIZE * 0.999621916911), (0, 0), align=None)
    chamfer2_piece_19a = extrude(amount=18.285841494, mode=Mode.PRIVATE)
    chamfer2_piece_19a = split(chamfer2_piece_19a, bisect_by=Plane(origin=(-8.5, 7.519397076, 0.164896813), z_dir=(-1, 0, 0)), keep=Keep.TOP, mode=Mode.PRIVATE)
    with BuildSketch(Plane(origin=(-8.5, 8.640341757, 0), x_dir=(0.02749587661058563, 0, 0.9996219169112968), z_dir=(0, -1, 0))) as chamfer2_piece_19b_section:
        Polygon((CHAMFER2_SIZE * 0.999621916911, CHAMFER2_SIZE * 0.0274958766106), (-CHAMFER2_SIZE * 0.0274958766106, CHAMFER2_SIZE * 0.999621916911), (0, 0), align=None)
    chamfer2_piece_19b = extrude(amount=2.785841494, mode=Mode.PRIVATE)
    chamfer2_piece_19b = split(chamfer2_piece_19b, bisect_by=Plane(origin=(-8.664896813, 7.354500263, 0.164896813), z_dir=(0, 1, 0)), keep=Keep.TOP, mode=Mode.PRIVATE)
    chamfer2_piece_19 = chamfer2_piece_19a & chamfer2_piece_19b
    add(chamfer2_piece_19, mode=Mode.SUBTRACT)

    # Chamfer3
    chamfer3_edges = [part.edges().sort_by_distance(p)[0] for p in [
        (0, -13.3, 5),
    ]]
    chamfer(chamfer3_edges, length=CHAMFER3_SIZE)


solid = part.part
